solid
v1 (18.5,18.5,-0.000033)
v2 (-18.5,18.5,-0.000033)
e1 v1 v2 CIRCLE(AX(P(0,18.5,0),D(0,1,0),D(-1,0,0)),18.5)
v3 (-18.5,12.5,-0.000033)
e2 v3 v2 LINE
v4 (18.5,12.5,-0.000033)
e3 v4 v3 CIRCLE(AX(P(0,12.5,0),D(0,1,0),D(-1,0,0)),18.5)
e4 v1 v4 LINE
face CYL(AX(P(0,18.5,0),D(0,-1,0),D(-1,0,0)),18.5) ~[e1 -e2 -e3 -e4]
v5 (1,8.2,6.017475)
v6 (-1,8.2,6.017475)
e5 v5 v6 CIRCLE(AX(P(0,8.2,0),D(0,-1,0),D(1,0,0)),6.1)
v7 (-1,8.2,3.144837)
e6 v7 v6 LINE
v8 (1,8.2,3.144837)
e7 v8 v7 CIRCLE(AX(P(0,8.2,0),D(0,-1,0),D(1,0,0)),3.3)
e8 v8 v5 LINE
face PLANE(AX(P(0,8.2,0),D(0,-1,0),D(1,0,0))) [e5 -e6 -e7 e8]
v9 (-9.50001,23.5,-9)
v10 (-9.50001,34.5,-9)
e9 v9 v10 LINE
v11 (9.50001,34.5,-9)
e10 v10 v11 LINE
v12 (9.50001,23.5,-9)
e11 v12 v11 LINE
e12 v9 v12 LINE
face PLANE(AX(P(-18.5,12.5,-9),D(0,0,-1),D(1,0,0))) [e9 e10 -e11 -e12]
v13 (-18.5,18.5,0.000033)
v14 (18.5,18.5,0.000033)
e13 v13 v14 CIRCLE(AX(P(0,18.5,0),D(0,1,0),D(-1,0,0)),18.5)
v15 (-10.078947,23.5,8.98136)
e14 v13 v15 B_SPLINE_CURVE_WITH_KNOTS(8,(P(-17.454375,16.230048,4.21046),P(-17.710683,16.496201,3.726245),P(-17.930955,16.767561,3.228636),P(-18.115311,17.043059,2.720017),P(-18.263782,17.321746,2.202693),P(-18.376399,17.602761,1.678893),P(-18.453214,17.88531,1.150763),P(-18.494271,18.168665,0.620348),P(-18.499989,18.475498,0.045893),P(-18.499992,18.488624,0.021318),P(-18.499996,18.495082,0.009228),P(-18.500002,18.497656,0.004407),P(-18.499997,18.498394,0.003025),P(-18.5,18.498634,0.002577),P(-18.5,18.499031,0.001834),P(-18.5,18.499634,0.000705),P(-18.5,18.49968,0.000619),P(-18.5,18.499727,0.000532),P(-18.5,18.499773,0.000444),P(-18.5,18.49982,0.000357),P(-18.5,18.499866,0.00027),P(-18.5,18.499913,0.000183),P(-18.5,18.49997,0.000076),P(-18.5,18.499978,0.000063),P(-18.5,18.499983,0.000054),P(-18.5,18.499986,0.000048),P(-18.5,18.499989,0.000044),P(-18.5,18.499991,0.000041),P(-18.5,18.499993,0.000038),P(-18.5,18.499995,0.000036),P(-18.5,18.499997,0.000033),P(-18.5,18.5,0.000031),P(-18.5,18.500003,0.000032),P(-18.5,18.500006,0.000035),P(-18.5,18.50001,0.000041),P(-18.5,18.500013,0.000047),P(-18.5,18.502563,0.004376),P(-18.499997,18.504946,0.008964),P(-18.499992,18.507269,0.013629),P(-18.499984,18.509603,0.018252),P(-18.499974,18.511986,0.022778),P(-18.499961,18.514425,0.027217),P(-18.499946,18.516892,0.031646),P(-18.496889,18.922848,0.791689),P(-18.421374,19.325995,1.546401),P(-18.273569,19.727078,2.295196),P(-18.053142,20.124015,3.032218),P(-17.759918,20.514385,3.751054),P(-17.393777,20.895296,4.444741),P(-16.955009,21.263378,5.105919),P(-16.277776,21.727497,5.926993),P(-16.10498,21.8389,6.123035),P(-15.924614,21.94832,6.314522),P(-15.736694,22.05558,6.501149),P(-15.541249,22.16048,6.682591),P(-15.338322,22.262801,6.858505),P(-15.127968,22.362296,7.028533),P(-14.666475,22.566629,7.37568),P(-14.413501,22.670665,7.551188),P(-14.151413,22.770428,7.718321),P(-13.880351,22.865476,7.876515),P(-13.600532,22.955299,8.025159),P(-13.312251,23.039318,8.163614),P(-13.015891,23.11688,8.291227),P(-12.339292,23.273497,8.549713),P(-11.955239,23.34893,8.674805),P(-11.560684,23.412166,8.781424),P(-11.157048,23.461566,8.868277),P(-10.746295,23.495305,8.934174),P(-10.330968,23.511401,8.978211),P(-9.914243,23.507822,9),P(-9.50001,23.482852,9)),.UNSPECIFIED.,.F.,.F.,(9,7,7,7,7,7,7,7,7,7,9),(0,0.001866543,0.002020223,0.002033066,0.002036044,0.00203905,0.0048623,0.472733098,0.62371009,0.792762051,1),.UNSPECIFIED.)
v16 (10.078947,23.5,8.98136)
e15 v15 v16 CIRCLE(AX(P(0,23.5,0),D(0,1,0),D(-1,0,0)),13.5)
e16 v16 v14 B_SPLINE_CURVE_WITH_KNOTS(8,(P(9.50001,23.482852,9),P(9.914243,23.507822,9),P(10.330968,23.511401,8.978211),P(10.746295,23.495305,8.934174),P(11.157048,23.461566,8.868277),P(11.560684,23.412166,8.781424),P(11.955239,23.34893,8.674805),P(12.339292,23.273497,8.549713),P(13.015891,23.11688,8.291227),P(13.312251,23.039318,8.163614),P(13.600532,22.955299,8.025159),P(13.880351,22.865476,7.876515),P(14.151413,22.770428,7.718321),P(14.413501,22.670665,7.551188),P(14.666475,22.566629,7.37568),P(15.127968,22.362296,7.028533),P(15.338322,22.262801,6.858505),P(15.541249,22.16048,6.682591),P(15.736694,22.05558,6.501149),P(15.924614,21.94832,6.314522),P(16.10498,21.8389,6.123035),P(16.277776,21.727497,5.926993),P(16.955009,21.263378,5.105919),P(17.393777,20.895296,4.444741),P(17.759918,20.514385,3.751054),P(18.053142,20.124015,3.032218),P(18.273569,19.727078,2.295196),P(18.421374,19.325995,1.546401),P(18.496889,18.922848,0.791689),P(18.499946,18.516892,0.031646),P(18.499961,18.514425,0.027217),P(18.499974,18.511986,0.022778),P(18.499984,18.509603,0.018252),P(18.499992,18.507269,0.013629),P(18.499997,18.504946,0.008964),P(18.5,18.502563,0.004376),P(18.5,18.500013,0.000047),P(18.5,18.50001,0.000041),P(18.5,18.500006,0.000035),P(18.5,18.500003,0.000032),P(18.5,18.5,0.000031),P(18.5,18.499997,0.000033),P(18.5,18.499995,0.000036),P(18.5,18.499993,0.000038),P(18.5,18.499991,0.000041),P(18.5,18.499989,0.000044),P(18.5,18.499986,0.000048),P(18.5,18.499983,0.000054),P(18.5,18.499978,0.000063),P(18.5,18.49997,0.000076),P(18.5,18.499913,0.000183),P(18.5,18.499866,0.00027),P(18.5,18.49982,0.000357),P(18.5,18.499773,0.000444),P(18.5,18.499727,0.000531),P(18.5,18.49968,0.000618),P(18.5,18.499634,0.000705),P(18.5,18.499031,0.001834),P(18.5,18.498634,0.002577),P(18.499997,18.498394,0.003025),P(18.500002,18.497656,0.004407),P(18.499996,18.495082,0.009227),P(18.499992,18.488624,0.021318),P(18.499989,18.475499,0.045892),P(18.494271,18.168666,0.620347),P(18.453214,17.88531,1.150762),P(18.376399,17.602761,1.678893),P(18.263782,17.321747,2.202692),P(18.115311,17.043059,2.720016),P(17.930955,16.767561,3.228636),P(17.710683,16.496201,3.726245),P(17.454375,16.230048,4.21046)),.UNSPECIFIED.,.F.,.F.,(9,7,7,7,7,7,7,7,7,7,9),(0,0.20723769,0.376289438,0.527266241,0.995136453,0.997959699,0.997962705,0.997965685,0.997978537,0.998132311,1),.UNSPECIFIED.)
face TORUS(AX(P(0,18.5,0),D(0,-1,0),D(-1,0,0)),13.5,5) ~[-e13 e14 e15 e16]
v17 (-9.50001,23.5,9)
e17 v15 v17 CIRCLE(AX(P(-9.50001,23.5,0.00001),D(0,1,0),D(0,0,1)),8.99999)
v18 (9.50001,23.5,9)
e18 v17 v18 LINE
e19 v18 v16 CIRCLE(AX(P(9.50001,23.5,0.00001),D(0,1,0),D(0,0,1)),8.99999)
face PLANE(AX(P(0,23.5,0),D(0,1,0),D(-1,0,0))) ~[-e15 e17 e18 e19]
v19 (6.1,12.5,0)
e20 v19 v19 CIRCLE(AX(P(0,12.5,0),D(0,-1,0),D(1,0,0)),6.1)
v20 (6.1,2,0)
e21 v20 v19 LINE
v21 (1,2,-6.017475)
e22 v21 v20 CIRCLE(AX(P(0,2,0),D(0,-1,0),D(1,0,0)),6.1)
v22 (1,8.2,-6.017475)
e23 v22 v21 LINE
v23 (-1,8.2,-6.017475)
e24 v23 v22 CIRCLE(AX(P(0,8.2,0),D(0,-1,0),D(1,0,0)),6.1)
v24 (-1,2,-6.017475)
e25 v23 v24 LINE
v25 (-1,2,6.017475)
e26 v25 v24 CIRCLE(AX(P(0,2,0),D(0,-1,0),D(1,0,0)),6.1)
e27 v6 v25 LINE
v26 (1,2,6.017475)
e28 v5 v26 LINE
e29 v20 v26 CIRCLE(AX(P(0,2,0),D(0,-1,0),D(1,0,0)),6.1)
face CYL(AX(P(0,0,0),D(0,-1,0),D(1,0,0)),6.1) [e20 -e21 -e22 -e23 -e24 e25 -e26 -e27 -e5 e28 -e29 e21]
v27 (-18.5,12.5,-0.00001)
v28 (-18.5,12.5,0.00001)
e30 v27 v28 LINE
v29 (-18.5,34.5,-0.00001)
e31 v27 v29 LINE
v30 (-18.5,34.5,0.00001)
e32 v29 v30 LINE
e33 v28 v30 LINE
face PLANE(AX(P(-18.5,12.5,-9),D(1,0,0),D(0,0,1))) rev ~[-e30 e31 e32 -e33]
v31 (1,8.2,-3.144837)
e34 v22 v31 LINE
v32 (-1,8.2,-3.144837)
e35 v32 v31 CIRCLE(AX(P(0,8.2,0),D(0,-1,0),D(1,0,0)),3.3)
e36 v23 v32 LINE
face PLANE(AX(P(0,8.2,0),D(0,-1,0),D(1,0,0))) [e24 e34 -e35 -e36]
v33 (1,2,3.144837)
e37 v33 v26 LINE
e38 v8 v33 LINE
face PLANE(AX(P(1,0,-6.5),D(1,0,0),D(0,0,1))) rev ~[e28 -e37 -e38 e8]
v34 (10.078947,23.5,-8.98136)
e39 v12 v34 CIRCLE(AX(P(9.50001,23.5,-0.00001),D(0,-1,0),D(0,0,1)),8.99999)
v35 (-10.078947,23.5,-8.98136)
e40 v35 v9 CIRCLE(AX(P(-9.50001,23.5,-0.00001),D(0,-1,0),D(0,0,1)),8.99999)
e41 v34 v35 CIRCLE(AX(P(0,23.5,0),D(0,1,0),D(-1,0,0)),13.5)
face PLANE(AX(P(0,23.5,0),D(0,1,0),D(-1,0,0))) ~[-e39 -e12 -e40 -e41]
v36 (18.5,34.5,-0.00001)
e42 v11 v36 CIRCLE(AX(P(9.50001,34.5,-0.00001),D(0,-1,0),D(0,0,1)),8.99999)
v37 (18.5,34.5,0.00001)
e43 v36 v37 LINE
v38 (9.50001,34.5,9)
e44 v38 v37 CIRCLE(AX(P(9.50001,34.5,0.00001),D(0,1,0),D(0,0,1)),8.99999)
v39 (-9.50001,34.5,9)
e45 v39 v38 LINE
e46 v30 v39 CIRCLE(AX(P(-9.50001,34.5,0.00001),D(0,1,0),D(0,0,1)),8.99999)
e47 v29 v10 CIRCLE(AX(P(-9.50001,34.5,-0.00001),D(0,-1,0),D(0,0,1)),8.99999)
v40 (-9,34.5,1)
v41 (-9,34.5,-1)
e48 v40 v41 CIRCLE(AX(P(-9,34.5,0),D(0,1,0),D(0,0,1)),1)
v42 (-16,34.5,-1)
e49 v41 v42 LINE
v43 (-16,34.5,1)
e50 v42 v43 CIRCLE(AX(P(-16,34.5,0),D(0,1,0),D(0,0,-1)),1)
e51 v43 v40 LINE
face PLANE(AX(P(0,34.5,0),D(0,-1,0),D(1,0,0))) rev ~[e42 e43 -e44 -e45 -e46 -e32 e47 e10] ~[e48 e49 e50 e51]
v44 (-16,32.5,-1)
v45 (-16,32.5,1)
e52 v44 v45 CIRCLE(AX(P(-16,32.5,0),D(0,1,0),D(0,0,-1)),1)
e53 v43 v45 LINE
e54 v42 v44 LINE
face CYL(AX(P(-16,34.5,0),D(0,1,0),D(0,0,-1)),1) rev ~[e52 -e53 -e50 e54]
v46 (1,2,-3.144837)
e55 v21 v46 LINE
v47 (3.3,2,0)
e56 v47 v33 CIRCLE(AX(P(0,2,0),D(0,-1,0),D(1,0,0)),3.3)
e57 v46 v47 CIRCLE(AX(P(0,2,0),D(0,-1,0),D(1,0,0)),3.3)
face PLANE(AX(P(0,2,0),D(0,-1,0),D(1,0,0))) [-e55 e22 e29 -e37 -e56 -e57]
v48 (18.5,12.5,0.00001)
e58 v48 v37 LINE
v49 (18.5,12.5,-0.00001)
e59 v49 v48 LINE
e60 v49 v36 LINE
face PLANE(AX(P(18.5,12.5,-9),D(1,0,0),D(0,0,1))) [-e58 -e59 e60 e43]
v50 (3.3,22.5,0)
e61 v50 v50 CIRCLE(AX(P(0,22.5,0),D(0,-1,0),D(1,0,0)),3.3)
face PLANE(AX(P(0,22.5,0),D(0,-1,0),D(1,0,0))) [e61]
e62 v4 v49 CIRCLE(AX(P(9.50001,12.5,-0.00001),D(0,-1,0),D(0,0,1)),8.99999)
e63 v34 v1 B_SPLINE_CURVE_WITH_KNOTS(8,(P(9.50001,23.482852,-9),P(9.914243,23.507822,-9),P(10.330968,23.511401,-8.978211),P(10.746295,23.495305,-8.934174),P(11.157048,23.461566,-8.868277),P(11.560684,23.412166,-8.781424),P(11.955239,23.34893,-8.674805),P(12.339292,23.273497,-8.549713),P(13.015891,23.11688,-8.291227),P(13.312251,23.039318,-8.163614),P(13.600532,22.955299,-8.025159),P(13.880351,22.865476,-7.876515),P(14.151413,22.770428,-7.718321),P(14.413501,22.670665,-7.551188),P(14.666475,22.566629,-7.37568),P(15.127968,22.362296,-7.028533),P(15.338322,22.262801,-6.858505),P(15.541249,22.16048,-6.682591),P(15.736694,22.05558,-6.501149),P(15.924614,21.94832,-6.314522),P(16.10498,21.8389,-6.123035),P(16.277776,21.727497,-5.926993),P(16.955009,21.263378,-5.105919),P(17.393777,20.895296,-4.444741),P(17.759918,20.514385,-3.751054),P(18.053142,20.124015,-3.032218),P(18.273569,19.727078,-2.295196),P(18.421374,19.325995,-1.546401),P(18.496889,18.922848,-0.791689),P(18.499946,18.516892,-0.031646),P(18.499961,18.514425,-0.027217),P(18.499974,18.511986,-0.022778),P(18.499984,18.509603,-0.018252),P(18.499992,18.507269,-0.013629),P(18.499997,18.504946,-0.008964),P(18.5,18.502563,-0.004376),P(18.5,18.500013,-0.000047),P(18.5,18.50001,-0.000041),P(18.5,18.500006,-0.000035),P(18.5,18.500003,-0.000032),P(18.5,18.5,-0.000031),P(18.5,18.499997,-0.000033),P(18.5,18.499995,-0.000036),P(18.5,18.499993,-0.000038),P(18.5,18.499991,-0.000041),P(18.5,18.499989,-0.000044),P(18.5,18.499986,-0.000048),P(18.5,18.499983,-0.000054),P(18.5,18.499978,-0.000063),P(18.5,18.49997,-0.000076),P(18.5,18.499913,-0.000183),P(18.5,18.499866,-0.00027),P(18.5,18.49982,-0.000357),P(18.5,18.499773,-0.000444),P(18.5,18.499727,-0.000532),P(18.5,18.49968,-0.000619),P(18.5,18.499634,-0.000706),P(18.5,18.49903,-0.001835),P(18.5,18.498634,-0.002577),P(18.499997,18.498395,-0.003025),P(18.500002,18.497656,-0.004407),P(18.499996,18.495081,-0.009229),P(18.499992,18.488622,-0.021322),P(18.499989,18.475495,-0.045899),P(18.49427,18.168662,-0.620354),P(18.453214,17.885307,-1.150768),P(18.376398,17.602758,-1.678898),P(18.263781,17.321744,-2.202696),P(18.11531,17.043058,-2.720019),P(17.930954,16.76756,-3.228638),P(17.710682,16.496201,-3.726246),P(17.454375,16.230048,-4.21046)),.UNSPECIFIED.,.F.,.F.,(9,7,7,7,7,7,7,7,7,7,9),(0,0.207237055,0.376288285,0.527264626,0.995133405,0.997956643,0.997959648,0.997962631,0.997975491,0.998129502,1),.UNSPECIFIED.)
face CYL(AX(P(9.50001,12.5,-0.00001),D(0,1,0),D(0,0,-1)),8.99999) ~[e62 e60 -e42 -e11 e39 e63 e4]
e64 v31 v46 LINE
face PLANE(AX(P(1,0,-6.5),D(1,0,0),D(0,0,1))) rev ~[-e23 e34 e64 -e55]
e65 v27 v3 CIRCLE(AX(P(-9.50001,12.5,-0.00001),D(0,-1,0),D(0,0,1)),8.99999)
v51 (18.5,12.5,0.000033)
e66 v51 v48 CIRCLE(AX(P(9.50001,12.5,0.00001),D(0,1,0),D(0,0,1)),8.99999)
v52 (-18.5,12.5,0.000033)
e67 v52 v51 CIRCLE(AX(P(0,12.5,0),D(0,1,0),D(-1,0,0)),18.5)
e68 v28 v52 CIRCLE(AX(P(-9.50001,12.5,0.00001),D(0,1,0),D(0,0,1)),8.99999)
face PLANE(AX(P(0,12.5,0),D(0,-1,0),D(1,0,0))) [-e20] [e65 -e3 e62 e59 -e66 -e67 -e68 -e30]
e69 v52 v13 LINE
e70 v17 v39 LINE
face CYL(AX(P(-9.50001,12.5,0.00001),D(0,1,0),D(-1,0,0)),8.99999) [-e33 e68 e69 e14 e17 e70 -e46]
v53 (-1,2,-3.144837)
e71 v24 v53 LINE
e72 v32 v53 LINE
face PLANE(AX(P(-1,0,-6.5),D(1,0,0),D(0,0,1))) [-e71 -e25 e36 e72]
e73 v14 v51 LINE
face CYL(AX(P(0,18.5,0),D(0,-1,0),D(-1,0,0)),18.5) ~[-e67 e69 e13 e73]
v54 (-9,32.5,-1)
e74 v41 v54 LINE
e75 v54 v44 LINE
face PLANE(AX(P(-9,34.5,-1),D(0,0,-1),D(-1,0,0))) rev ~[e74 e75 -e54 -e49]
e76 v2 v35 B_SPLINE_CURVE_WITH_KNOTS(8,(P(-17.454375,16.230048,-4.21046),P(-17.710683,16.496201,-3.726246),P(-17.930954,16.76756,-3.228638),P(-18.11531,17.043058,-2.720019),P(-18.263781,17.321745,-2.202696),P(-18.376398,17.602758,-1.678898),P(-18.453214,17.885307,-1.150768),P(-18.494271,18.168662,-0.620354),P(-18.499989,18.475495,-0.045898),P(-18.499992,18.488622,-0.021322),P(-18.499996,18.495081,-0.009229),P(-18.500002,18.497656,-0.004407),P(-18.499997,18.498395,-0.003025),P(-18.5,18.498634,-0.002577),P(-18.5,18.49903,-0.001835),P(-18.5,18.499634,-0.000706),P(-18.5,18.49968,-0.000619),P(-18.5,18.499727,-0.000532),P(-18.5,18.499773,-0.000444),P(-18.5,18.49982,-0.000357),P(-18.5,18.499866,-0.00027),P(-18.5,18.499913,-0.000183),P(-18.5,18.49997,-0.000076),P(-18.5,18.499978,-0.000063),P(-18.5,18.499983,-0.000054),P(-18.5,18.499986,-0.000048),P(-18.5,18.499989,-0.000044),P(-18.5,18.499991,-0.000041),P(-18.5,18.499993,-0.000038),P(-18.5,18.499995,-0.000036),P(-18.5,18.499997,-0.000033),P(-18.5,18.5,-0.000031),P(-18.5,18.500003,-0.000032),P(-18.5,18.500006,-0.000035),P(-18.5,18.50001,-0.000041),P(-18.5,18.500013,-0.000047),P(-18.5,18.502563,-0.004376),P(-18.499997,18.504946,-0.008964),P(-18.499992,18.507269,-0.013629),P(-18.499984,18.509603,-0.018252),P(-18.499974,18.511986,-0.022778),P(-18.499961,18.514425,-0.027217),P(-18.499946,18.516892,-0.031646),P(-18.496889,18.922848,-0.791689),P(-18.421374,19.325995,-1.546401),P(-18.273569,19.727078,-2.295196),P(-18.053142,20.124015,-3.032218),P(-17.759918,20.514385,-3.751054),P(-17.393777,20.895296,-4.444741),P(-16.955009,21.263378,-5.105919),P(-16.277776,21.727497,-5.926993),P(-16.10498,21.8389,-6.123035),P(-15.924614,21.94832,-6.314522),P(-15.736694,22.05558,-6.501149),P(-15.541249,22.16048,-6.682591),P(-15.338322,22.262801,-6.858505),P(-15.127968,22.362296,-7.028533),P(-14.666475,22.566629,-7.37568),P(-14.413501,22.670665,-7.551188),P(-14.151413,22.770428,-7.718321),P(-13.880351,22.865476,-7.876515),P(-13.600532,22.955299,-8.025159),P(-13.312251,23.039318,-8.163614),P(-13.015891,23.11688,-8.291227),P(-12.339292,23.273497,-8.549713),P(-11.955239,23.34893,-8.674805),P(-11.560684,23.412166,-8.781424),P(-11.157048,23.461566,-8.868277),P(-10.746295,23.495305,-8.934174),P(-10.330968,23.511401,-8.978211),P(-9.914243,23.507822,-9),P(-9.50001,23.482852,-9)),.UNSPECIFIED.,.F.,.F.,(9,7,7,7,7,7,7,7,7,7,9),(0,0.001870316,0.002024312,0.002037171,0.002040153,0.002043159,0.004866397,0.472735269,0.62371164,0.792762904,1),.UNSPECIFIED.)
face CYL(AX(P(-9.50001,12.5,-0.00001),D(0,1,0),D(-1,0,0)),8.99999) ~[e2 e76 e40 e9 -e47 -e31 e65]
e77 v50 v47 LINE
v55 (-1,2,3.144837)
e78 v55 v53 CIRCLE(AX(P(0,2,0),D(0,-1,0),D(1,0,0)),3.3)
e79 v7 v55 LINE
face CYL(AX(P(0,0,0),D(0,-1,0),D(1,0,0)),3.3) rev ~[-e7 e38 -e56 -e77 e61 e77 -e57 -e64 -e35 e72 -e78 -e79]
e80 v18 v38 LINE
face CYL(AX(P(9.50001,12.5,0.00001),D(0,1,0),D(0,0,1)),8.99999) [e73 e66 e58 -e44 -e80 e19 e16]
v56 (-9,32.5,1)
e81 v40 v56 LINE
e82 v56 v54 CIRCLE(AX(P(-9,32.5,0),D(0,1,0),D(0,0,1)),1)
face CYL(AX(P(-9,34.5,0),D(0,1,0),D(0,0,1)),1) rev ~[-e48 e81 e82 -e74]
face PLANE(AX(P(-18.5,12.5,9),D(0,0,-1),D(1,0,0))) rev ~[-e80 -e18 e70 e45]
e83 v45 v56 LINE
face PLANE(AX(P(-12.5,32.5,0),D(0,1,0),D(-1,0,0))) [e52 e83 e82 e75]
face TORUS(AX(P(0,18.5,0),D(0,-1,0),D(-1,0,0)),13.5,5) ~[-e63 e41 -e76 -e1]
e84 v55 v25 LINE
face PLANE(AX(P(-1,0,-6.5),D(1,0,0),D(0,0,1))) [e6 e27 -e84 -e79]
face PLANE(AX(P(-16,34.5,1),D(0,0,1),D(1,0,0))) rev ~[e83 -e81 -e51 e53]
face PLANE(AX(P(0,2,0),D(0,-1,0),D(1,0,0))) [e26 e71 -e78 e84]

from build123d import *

# Parameters (mm, degrees)
F0_R      = 6.1
F0_R_2    = 3.3
F1_DEPTH  = 20
F4_DEPTH  = 2
F6_W      = 37
F6_H      = 18
F7_DEPTH  = 22
F8_R      = 8.99999
F9_R      = 8.99999
F10_R     = 8.99999
F12_W     = 2
F12_H     = 13
F13_DEPTH = 8.2
F14_R     = 3.3
F15_DEPTH = 10
F17_DEPTH = 2


# Not quite as in the source:
# - a fillet or chamfer is up to 0.001 mm smaller than in the source, because OpenCascade refuses the exact size


with BuildPart() as f1:
    # F0 (on Front) → F1 (new body)
    with BuildSketch(Plane.XZ):
        Circle(F0_R)
        Circle(F0_R_2, mode=Mode.SUBTRACT)
    extrude(amount=-F1_DEPTH)

    # F2 (on Top) → F3 (revolve)
    with BuildSketch(Plane.XY):
        with BuildLine():
            Line((-18.5, 12.5), (0, 12.5))
            Line((0, 12.5), (0, 23.5))
            Line((0, 23.5), (-13.5, 23.5))
            ThreePointArc((-13.5, 23.5), (-17.0355339059, 22.0355339059), (-18.5, 18.5))
            Line((-18.5, 18.5), (-18.5, 12.5))
        make_face()
    revolve(axis=Axis((0, 18, 0), (0, 1, 0)))

    # F0 (on Front) → F4 (cut)
    with BuildSketch(Plane.XZ):
        Circle(F0_R)
        Circle(F0_R_2, mode=Mode.SUBTRACT)
    extrude(amount=-F4_DEPTH, mode=Mode.SUBTRACT)

    # F6 (on offset) → F7 (join)
    with BuildSketch(Plane.XZ.offset(-12.5)):
        Rectangle(F6_W, F6_H)
    extrude(amount=-F7_DEPTH)

    # F8 (radius 9 in the source; OpenCascade refuses exactly that, so slightly less here)
    f8_edges = [f1.edges().sort_by_distance(p)[0] for p in [
        (-18.5, 23.5, -9),
    ]]
    fillet(f8_edges, radius=F8_R)

    # F9 (radius 9 in the source; OpenCascade refuses exactly that, so slightly less here)
    f9_edges = [f1.edges().sort_by_distance(p)[0] for p in [
        (-18.5, 23.5, 9),
    ]]
    fillet(f9_edges, radius=F9_R)

    # F10 (radius 9 in the source; OpenCascade refuses exactly that, so slightly less here)
    f10_edges = [f1.edges().sort_by_distance(p)[0] for p in [
        (18.5, 23.5, -9),
        (18.5, 23.5, 9),
    ]]
    fillet(f10_edges, radius=F10_R)

    # F12 (on face) → F13 (cut)
    with BuildSketch(Plane.XZ):
        Rectangle(F12_W, F12_H)
    extrude(amount=-F13_DEPTH, mode=Mode.SUBTRACT)

    # F14 (on face) → F15 (cut)
    with BuildSketch(Plane.XZ.offset(-12.5)):
        Circle(F14_R)
    extrude(amount=-F15_DEPTH, mode=Mode.SUBTRACT)

    # F16 (on offset) → F17 (cut)
    with BuildSketch(Plane(origin=(0, 34.5, 0), x_dir=(-1, 0, 0), z_dir=(0, 1, 0))):
        with BuildLine():
            ThreePointArc((16, -1), (17, 0), (16, 1))
            Line((16, 1), (9, 1))
            ThreePointArc((9, 1), (8, 0), (9, -1))
            Line((9, -1), (16, -1))
        make_face()
    extrude(amount=-F17_DEPTH, mode=Mode.SUBTRACT)


solid = f1.part
